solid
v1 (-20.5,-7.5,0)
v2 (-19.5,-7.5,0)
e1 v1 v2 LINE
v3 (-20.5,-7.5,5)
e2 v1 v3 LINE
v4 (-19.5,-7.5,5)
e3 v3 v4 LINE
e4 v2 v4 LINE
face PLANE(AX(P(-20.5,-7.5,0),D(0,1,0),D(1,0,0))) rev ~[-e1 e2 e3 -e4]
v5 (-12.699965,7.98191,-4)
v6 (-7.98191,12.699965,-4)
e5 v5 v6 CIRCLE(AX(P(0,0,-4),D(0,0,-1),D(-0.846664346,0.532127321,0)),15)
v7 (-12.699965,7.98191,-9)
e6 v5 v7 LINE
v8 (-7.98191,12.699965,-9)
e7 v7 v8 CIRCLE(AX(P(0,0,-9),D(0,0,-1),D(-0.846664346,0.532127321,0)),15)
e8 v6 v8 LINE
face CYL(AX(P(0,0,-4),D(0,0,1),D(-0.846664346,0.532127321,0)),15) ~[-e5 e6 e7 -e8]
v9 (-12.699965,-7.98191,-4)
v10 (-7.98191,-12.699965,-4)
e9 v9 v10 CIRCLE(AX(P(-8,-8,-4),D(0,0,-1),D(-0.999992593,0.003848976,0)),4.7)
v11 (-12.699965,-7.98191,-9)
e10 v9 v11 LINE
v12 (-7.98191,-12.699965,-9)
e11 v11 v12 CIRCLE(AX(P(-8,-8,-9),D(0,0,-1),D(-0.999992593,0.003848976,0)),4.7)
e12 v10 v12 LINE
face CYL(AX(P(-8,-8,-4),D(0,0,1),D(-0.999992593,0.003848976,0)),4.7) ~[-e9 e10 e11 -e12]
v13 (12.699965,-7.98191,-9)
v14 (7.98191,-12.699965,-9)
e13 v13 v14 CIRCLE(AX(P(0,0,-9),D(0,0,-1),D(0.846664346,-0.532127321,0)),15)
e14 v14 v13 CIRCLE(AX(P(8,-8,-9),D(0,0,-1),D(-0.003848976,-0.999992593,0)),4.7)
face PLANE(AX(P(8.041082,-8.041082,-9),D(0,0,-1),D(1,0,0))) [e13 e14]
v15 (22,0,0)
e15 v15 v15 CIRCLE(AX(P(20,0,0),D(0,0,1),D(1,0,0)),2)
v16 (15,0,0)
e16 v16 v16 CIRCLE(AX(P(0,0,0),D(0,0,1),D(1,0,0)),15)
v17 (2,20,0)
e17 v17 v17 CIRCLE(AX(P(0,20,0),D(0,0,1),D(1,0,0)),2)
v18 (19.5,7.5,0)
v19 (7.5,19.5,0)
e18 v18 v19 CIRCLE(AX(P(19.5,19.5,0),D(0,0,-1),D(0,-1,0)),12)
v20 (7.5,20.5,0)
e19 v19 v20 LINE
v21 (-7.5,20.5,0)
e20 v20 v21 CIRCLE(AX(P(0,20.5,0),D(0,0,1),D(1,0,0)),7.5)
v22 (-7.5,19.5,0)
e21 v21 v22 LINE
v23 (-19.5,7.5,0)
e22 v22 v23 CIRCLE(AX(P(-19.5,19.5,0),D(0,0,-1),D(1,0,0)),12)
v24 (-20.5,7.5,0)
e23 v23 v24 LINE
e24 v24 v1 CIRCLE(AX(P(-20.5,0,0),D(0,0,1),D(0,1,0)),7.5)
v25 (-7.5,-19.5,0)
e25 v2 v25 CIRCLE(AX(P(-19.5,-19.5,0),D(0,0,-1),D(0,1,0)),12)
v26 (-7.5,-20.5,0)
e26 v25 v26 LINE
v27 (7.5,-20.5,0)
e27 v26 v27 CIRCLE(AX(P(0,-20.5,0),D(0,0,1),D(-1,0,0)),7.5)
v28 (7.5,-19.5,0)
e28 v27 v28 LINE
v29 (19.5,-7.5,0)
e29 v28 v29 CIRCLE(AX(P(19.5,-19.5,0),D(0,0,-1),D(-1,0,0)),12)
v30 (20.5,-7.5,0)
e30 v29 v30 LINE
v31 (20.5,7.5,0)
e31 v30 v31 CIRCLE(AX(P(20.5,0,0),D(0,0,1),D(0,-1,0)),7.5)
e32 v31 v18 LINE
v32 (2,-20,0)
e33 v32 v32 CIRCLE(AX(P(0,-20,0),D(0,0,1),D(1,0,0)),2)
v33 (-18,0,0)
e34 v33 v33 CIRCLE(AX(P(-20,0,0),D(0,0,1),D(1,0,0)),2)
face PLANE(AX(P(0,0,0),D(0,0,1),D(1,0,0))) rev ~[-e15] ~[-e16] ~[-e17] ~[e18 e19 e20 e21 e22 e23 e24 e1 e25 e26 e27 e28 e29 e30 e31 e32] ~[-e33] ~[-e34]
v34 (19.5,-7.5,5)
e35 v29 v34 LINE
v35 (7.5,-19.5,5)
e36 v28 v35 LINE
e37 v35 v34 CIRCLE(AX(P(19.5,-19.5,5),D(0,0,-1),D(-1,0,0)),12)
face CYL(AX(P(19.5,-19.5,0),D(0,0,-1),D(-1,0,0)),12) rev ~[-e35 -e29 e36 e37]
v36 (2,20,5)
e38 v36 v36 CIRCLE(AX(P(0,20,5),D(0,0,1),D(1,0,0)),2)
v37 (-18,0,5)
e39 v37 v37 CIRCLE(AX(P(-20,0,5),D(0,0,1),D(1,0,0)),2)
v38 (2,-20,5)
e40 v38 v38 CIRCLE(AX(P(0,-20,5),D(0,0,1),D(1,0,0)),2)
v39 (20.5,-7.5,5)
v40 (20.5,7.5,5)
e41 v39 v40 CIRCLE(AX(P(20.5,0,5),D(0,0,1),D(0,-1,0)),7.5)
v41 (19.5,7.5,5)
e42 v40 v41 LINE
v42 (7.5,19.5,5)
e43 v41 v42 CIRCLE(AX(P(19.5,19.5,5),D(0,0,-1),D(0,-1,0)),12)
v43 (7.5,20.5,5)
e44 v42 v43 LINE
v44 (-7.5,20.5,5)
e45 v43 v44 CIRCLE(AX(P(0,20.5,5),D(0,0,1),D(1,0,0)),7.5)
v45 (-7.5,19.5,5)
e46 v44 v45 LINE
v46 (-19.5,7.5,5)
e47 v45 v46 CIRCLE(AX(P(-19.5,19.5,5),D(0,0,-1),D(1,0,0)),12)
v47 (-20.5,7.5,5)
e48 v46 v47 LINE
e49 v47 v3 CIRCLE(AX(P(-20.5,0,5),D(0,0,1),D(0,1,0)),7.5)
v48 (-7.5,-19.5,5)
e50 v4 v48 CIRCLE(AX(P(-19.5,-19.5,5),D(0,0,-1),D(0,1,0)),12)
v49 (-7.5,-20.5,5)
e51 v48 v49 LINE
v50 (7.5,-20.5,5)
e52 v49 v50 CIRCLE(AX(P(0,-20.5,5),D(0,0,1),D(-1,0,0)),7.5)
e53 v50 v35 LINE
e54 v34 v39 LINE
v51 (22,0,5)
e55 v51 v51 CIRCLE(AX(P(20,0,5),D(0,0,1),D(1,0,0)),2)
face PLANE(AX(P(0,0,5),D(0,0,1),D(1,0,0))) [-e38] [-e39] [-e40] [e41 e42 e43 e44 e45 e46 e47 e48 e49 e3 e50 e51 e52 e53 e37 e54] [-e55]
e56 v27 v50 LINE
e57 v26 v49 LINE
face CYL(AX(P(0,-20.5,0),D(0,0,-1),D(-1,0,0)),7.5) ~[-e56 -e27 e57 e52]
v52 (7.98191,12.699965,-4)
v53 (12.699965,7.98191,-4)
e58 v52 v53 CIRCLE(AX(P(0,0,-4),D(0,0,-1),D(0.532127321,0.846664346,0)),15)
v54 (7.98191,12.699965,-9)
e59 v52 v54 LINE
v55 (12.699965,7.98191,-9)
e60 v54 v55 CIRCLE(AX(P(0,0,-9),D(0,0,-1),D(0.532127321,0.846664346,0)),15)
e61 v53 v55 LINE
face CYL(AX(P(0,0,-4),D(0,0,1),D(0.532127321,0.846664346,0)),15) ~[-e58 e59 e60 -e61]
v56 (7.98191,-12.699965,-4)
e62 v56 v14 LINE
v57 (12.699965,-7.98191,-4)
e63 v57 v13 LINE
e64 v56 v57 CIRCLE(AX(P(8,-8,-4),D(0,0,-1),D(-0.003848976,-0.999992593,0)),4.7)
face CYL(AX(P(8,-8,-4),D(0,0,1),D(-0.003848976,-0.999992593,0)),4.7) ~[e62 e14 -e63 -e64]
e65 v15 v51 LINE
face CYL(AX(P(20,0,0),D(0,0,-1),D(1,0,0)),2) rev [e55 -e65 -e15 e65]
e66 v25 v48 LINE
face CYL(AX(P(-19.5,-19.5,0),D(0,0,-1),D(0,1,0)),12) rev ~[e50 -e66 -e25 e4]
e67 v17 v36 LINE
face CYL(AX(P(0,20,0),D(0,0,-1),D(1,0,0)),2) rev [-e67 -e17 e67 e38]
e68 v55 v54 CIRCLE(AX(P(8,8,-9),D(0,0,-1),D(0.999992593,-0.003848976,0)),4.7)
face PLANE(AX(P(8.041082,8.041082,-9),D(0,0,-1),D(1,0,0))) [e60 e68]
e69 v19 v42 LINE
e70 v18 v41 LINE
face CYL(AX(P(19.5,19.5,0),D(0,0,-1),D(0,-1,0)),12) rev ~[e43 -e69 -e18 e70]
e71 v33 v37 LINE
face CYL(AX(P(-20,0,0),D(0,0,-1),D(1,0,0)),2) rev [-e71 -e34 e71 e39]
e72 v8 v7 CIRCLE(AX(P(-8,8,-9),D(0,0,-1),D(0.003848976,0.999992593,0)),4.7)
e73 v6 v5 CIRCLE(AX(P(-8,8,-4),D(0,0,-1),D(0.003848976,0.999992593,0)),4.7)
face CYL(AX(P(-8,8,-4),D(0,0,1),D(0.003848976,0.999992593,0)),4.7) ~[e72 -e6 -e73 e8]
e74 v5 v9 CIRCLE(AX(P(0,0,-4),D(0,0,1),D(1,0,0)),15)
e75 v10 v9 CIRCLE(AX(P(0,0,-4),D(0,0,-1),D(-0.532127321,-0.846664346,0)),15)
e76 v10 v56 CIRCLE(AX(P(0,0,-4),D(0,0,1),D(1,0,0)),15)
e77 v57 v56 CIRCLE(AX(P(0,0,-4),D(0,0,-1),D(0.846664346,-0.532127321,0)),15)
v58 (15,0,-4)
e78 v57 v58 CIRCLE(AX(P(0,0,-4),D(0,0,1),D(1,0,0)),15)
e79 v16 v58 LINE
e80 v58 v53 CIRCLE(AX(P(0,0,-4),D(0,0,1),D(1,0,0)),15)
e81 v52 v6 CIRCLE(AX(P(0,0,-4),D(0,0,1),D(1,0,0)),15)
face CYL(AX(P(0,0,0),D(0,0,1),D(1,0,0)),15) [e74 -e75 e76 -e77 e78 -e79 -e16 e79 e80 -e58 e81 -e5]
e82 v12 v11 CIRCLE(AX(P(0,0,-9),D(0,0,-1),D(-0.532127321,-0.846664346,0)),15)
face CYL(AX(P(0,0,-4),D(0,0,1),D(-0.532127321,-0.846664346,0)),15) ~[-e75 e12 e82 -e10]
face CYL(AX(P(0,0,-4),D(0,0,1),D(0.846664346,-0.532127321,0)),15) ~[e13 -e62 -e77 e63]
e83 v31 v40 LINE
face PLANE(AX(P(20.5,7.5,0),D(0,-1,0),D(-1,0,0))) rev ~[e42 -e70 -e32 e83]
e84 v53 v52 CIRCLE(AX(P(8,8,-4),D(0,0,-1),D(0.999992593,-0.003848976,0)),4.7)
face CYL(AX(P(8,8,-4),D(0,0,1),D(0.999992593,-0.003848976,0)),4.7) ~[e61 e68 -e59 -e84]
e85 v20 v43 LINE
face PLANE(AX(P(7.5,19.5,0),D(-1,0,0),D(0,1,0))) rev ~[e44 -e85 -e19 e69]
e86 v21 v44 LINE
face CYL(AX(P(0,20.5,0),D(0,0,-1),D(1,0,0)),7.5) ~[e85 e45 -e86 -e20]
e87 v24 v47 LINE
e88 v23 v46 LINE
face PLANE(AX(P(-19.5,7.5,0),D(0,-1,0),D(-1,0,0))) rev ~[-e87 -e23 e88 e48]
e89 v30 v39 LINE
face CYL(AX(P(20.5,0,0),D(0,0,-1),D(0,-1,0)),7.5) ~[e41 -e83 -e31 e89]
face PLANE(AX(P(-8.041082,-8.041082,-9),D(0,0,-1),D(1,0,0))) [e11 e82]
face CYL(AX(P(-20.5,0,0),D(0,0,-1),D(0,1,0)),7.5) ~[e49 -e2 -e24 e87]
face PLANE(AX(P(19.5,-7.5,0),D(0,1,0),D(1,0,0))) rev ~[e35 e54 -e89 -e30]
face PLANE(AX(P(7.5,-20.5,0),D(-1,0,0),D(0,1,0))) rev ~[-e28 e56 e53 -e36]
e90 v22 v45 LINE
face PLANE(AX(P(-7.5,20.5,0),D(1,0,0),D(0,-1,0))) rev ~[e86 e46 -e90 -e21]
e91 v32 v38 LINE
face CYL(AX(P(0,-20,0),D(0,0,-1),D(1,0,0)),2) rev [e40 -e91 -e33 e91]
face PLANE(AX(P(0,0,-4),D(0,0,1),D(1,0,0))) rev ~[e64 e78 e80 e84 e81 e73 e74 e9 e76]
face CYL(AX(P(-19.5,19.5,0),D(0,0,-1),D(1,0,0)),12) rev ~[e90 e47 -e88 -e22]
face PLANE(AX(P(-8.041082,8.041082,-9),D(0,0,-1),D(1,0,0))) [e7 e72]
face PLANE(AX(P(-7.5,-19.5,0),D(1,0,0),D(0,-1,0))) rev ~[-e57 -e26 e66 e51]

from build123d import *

# Parameters (mm, degrees)
F0_R     = 2
F1_DEPTH = 5
F2_R     = 15
F3_DEPTH = 4
F5_DEPTH = 5


# Not quite as in the source:
# - after a boolean that leaves OpenCascade's solid faulty, fix() repairs it


with BuildPart() as f1:
    # F0 (on Top) → F1 (new body)
    with BuildSketch(Plane.XY):
        with BuildLine():
            ThreePointArc((0, 28), (-5.3033008589, 25.8033008589), (-7.5, 20.5))
            Line((-7.5, 20.5), (-7.5, 19.5))
            ThreePointArc((-7.5, 19.5), (-11.0147186258, 11.0147186258), (-19.5, 7.5))
            Line((-19.5, 7.5), (-20.5, 7.5))
            ThreePointArc((-20.5, 7.5), (-25.8033008589, 5.3033008589), (-28, 0))
            ThreePointArc((-28, 0), (-25.8033008589, -5.3033008589), (-20.5, -7.5))
            Line((-20.5, -7.5), (-19.5, -7.5))
            ThreePointArc((-19.5, -7.5), (-11.0147186258, -11.0147186258), (-7.5, -19.5))
            Line((-7.5, -19.5), (-7.5, -20.5))
            ThreePointArc((-7.5, -20.5), (-5.3033008589, -25.8033008589), (0, -28))
            ThreePointArc((0, -28), (5.3033008589, -25.8033008589), (7.5, -20.5))
            Line((7.5, -20.5), (7.5, -19.5))
            ThreePointArc((7.5, -19.5), (11.0147186258, -11.0147186258), (19.5, -7.5))
            Line((19.5, -7.5), (20.5, -7.5))
            ThreePointArc((20.5, -7.5), (25.8033008589, -5.3033008589), (28, 0))
            ThreePointArc((28, 0), (25.8033008589, 5.3033008589), (20.5, 7.5))
            Line((20.5, 7.5), (19.5, 7.5))
            ThreePointArc((19.5, 7.5), (11.0147186258, 11.0147186258), (7.5, 19.5))
            Line((7.5, 19.5), (7.5, 20.5))
            ThreePointArc((7.5, 20.5), (5.3033008589, 25.8033008589), (0, 28))
        make_face()
        with Locations((0, -20)):
            Circle(F0_R, mode=Mode.SUBTRACT)
        with Locations((-20, 0)):
            Circle(F0_R, mode=Mode.SUBTRACT)
        with Locations((20, 0)):
            Circle(F0_R, mode=Mode.SUBTRACT)
        with Locations((0, 20)):
            Circle(F0_R, mode=Mode.SUBTRACT)
    extrude(amount=F1_DEPTH)

    # F2 (on Top) → F3 (join)
    with BuildSketch(Plane.XY):
        Circle(F2_R)
    extrude(amount=-F3_DEPTH)

    # F4 (on face) → F5 (join)
    with BuildSketch(Plane(origin=(0, 0, -4), x_dir=(1, 0, 0), z_dir=(0, 0, -1))):
        with BuildLine():
            ThreePointArc((-7.9819098145, 12.6999651855), (-10.6066017178, 10.6066017178), (-12.6999651855, 7.9819098145))
            ThreePointArc((-12.6999651855, 7.9819098145), (-4.6765981284, 4.6765981284), (-7.9819098145, 12.6999651855))
        make_face()
        with BuildLine():
            ThreePointArc((12.6999651855, 7.9819098145), (10.6066017178, 10.6066017178), (7.9819098145, 12.6999651855))
            ThreePointArc((7.9819098145, 12.6999651855), (4.6765981284, 4.6765981284), (12.6999651855, 7.9819098145))
        make_face()
        with BuildLine():
            ThreePointArc((7.9819098145, -12.6999651855), (10.6066017178, -10.6066017178), (12.6999651855, -7.9819098145))
            ThreePointArc((12.6999651855, -7.9819098145), (4.6765981284, -4.6765981284), (7.9819098145, -12.6999651855))
        make_face()
        with BuildLine():
            ThreePointArc((-12.6999651855, -7.9819098145), (-10.6066017178, -10.6066017178), (-7.9819098145, -12.6999651855))
            ThreePointArc((-7.9819098145, -12.6999651855), (-4.6765981284, -4.6765981284), (-12.6999651855, -7.9819098145))
        make_face()
    extrude(amount=F5_DEPTH)

    add(f1.part.fix(), mode=Mode.REPLACE)


solid = f1.part
